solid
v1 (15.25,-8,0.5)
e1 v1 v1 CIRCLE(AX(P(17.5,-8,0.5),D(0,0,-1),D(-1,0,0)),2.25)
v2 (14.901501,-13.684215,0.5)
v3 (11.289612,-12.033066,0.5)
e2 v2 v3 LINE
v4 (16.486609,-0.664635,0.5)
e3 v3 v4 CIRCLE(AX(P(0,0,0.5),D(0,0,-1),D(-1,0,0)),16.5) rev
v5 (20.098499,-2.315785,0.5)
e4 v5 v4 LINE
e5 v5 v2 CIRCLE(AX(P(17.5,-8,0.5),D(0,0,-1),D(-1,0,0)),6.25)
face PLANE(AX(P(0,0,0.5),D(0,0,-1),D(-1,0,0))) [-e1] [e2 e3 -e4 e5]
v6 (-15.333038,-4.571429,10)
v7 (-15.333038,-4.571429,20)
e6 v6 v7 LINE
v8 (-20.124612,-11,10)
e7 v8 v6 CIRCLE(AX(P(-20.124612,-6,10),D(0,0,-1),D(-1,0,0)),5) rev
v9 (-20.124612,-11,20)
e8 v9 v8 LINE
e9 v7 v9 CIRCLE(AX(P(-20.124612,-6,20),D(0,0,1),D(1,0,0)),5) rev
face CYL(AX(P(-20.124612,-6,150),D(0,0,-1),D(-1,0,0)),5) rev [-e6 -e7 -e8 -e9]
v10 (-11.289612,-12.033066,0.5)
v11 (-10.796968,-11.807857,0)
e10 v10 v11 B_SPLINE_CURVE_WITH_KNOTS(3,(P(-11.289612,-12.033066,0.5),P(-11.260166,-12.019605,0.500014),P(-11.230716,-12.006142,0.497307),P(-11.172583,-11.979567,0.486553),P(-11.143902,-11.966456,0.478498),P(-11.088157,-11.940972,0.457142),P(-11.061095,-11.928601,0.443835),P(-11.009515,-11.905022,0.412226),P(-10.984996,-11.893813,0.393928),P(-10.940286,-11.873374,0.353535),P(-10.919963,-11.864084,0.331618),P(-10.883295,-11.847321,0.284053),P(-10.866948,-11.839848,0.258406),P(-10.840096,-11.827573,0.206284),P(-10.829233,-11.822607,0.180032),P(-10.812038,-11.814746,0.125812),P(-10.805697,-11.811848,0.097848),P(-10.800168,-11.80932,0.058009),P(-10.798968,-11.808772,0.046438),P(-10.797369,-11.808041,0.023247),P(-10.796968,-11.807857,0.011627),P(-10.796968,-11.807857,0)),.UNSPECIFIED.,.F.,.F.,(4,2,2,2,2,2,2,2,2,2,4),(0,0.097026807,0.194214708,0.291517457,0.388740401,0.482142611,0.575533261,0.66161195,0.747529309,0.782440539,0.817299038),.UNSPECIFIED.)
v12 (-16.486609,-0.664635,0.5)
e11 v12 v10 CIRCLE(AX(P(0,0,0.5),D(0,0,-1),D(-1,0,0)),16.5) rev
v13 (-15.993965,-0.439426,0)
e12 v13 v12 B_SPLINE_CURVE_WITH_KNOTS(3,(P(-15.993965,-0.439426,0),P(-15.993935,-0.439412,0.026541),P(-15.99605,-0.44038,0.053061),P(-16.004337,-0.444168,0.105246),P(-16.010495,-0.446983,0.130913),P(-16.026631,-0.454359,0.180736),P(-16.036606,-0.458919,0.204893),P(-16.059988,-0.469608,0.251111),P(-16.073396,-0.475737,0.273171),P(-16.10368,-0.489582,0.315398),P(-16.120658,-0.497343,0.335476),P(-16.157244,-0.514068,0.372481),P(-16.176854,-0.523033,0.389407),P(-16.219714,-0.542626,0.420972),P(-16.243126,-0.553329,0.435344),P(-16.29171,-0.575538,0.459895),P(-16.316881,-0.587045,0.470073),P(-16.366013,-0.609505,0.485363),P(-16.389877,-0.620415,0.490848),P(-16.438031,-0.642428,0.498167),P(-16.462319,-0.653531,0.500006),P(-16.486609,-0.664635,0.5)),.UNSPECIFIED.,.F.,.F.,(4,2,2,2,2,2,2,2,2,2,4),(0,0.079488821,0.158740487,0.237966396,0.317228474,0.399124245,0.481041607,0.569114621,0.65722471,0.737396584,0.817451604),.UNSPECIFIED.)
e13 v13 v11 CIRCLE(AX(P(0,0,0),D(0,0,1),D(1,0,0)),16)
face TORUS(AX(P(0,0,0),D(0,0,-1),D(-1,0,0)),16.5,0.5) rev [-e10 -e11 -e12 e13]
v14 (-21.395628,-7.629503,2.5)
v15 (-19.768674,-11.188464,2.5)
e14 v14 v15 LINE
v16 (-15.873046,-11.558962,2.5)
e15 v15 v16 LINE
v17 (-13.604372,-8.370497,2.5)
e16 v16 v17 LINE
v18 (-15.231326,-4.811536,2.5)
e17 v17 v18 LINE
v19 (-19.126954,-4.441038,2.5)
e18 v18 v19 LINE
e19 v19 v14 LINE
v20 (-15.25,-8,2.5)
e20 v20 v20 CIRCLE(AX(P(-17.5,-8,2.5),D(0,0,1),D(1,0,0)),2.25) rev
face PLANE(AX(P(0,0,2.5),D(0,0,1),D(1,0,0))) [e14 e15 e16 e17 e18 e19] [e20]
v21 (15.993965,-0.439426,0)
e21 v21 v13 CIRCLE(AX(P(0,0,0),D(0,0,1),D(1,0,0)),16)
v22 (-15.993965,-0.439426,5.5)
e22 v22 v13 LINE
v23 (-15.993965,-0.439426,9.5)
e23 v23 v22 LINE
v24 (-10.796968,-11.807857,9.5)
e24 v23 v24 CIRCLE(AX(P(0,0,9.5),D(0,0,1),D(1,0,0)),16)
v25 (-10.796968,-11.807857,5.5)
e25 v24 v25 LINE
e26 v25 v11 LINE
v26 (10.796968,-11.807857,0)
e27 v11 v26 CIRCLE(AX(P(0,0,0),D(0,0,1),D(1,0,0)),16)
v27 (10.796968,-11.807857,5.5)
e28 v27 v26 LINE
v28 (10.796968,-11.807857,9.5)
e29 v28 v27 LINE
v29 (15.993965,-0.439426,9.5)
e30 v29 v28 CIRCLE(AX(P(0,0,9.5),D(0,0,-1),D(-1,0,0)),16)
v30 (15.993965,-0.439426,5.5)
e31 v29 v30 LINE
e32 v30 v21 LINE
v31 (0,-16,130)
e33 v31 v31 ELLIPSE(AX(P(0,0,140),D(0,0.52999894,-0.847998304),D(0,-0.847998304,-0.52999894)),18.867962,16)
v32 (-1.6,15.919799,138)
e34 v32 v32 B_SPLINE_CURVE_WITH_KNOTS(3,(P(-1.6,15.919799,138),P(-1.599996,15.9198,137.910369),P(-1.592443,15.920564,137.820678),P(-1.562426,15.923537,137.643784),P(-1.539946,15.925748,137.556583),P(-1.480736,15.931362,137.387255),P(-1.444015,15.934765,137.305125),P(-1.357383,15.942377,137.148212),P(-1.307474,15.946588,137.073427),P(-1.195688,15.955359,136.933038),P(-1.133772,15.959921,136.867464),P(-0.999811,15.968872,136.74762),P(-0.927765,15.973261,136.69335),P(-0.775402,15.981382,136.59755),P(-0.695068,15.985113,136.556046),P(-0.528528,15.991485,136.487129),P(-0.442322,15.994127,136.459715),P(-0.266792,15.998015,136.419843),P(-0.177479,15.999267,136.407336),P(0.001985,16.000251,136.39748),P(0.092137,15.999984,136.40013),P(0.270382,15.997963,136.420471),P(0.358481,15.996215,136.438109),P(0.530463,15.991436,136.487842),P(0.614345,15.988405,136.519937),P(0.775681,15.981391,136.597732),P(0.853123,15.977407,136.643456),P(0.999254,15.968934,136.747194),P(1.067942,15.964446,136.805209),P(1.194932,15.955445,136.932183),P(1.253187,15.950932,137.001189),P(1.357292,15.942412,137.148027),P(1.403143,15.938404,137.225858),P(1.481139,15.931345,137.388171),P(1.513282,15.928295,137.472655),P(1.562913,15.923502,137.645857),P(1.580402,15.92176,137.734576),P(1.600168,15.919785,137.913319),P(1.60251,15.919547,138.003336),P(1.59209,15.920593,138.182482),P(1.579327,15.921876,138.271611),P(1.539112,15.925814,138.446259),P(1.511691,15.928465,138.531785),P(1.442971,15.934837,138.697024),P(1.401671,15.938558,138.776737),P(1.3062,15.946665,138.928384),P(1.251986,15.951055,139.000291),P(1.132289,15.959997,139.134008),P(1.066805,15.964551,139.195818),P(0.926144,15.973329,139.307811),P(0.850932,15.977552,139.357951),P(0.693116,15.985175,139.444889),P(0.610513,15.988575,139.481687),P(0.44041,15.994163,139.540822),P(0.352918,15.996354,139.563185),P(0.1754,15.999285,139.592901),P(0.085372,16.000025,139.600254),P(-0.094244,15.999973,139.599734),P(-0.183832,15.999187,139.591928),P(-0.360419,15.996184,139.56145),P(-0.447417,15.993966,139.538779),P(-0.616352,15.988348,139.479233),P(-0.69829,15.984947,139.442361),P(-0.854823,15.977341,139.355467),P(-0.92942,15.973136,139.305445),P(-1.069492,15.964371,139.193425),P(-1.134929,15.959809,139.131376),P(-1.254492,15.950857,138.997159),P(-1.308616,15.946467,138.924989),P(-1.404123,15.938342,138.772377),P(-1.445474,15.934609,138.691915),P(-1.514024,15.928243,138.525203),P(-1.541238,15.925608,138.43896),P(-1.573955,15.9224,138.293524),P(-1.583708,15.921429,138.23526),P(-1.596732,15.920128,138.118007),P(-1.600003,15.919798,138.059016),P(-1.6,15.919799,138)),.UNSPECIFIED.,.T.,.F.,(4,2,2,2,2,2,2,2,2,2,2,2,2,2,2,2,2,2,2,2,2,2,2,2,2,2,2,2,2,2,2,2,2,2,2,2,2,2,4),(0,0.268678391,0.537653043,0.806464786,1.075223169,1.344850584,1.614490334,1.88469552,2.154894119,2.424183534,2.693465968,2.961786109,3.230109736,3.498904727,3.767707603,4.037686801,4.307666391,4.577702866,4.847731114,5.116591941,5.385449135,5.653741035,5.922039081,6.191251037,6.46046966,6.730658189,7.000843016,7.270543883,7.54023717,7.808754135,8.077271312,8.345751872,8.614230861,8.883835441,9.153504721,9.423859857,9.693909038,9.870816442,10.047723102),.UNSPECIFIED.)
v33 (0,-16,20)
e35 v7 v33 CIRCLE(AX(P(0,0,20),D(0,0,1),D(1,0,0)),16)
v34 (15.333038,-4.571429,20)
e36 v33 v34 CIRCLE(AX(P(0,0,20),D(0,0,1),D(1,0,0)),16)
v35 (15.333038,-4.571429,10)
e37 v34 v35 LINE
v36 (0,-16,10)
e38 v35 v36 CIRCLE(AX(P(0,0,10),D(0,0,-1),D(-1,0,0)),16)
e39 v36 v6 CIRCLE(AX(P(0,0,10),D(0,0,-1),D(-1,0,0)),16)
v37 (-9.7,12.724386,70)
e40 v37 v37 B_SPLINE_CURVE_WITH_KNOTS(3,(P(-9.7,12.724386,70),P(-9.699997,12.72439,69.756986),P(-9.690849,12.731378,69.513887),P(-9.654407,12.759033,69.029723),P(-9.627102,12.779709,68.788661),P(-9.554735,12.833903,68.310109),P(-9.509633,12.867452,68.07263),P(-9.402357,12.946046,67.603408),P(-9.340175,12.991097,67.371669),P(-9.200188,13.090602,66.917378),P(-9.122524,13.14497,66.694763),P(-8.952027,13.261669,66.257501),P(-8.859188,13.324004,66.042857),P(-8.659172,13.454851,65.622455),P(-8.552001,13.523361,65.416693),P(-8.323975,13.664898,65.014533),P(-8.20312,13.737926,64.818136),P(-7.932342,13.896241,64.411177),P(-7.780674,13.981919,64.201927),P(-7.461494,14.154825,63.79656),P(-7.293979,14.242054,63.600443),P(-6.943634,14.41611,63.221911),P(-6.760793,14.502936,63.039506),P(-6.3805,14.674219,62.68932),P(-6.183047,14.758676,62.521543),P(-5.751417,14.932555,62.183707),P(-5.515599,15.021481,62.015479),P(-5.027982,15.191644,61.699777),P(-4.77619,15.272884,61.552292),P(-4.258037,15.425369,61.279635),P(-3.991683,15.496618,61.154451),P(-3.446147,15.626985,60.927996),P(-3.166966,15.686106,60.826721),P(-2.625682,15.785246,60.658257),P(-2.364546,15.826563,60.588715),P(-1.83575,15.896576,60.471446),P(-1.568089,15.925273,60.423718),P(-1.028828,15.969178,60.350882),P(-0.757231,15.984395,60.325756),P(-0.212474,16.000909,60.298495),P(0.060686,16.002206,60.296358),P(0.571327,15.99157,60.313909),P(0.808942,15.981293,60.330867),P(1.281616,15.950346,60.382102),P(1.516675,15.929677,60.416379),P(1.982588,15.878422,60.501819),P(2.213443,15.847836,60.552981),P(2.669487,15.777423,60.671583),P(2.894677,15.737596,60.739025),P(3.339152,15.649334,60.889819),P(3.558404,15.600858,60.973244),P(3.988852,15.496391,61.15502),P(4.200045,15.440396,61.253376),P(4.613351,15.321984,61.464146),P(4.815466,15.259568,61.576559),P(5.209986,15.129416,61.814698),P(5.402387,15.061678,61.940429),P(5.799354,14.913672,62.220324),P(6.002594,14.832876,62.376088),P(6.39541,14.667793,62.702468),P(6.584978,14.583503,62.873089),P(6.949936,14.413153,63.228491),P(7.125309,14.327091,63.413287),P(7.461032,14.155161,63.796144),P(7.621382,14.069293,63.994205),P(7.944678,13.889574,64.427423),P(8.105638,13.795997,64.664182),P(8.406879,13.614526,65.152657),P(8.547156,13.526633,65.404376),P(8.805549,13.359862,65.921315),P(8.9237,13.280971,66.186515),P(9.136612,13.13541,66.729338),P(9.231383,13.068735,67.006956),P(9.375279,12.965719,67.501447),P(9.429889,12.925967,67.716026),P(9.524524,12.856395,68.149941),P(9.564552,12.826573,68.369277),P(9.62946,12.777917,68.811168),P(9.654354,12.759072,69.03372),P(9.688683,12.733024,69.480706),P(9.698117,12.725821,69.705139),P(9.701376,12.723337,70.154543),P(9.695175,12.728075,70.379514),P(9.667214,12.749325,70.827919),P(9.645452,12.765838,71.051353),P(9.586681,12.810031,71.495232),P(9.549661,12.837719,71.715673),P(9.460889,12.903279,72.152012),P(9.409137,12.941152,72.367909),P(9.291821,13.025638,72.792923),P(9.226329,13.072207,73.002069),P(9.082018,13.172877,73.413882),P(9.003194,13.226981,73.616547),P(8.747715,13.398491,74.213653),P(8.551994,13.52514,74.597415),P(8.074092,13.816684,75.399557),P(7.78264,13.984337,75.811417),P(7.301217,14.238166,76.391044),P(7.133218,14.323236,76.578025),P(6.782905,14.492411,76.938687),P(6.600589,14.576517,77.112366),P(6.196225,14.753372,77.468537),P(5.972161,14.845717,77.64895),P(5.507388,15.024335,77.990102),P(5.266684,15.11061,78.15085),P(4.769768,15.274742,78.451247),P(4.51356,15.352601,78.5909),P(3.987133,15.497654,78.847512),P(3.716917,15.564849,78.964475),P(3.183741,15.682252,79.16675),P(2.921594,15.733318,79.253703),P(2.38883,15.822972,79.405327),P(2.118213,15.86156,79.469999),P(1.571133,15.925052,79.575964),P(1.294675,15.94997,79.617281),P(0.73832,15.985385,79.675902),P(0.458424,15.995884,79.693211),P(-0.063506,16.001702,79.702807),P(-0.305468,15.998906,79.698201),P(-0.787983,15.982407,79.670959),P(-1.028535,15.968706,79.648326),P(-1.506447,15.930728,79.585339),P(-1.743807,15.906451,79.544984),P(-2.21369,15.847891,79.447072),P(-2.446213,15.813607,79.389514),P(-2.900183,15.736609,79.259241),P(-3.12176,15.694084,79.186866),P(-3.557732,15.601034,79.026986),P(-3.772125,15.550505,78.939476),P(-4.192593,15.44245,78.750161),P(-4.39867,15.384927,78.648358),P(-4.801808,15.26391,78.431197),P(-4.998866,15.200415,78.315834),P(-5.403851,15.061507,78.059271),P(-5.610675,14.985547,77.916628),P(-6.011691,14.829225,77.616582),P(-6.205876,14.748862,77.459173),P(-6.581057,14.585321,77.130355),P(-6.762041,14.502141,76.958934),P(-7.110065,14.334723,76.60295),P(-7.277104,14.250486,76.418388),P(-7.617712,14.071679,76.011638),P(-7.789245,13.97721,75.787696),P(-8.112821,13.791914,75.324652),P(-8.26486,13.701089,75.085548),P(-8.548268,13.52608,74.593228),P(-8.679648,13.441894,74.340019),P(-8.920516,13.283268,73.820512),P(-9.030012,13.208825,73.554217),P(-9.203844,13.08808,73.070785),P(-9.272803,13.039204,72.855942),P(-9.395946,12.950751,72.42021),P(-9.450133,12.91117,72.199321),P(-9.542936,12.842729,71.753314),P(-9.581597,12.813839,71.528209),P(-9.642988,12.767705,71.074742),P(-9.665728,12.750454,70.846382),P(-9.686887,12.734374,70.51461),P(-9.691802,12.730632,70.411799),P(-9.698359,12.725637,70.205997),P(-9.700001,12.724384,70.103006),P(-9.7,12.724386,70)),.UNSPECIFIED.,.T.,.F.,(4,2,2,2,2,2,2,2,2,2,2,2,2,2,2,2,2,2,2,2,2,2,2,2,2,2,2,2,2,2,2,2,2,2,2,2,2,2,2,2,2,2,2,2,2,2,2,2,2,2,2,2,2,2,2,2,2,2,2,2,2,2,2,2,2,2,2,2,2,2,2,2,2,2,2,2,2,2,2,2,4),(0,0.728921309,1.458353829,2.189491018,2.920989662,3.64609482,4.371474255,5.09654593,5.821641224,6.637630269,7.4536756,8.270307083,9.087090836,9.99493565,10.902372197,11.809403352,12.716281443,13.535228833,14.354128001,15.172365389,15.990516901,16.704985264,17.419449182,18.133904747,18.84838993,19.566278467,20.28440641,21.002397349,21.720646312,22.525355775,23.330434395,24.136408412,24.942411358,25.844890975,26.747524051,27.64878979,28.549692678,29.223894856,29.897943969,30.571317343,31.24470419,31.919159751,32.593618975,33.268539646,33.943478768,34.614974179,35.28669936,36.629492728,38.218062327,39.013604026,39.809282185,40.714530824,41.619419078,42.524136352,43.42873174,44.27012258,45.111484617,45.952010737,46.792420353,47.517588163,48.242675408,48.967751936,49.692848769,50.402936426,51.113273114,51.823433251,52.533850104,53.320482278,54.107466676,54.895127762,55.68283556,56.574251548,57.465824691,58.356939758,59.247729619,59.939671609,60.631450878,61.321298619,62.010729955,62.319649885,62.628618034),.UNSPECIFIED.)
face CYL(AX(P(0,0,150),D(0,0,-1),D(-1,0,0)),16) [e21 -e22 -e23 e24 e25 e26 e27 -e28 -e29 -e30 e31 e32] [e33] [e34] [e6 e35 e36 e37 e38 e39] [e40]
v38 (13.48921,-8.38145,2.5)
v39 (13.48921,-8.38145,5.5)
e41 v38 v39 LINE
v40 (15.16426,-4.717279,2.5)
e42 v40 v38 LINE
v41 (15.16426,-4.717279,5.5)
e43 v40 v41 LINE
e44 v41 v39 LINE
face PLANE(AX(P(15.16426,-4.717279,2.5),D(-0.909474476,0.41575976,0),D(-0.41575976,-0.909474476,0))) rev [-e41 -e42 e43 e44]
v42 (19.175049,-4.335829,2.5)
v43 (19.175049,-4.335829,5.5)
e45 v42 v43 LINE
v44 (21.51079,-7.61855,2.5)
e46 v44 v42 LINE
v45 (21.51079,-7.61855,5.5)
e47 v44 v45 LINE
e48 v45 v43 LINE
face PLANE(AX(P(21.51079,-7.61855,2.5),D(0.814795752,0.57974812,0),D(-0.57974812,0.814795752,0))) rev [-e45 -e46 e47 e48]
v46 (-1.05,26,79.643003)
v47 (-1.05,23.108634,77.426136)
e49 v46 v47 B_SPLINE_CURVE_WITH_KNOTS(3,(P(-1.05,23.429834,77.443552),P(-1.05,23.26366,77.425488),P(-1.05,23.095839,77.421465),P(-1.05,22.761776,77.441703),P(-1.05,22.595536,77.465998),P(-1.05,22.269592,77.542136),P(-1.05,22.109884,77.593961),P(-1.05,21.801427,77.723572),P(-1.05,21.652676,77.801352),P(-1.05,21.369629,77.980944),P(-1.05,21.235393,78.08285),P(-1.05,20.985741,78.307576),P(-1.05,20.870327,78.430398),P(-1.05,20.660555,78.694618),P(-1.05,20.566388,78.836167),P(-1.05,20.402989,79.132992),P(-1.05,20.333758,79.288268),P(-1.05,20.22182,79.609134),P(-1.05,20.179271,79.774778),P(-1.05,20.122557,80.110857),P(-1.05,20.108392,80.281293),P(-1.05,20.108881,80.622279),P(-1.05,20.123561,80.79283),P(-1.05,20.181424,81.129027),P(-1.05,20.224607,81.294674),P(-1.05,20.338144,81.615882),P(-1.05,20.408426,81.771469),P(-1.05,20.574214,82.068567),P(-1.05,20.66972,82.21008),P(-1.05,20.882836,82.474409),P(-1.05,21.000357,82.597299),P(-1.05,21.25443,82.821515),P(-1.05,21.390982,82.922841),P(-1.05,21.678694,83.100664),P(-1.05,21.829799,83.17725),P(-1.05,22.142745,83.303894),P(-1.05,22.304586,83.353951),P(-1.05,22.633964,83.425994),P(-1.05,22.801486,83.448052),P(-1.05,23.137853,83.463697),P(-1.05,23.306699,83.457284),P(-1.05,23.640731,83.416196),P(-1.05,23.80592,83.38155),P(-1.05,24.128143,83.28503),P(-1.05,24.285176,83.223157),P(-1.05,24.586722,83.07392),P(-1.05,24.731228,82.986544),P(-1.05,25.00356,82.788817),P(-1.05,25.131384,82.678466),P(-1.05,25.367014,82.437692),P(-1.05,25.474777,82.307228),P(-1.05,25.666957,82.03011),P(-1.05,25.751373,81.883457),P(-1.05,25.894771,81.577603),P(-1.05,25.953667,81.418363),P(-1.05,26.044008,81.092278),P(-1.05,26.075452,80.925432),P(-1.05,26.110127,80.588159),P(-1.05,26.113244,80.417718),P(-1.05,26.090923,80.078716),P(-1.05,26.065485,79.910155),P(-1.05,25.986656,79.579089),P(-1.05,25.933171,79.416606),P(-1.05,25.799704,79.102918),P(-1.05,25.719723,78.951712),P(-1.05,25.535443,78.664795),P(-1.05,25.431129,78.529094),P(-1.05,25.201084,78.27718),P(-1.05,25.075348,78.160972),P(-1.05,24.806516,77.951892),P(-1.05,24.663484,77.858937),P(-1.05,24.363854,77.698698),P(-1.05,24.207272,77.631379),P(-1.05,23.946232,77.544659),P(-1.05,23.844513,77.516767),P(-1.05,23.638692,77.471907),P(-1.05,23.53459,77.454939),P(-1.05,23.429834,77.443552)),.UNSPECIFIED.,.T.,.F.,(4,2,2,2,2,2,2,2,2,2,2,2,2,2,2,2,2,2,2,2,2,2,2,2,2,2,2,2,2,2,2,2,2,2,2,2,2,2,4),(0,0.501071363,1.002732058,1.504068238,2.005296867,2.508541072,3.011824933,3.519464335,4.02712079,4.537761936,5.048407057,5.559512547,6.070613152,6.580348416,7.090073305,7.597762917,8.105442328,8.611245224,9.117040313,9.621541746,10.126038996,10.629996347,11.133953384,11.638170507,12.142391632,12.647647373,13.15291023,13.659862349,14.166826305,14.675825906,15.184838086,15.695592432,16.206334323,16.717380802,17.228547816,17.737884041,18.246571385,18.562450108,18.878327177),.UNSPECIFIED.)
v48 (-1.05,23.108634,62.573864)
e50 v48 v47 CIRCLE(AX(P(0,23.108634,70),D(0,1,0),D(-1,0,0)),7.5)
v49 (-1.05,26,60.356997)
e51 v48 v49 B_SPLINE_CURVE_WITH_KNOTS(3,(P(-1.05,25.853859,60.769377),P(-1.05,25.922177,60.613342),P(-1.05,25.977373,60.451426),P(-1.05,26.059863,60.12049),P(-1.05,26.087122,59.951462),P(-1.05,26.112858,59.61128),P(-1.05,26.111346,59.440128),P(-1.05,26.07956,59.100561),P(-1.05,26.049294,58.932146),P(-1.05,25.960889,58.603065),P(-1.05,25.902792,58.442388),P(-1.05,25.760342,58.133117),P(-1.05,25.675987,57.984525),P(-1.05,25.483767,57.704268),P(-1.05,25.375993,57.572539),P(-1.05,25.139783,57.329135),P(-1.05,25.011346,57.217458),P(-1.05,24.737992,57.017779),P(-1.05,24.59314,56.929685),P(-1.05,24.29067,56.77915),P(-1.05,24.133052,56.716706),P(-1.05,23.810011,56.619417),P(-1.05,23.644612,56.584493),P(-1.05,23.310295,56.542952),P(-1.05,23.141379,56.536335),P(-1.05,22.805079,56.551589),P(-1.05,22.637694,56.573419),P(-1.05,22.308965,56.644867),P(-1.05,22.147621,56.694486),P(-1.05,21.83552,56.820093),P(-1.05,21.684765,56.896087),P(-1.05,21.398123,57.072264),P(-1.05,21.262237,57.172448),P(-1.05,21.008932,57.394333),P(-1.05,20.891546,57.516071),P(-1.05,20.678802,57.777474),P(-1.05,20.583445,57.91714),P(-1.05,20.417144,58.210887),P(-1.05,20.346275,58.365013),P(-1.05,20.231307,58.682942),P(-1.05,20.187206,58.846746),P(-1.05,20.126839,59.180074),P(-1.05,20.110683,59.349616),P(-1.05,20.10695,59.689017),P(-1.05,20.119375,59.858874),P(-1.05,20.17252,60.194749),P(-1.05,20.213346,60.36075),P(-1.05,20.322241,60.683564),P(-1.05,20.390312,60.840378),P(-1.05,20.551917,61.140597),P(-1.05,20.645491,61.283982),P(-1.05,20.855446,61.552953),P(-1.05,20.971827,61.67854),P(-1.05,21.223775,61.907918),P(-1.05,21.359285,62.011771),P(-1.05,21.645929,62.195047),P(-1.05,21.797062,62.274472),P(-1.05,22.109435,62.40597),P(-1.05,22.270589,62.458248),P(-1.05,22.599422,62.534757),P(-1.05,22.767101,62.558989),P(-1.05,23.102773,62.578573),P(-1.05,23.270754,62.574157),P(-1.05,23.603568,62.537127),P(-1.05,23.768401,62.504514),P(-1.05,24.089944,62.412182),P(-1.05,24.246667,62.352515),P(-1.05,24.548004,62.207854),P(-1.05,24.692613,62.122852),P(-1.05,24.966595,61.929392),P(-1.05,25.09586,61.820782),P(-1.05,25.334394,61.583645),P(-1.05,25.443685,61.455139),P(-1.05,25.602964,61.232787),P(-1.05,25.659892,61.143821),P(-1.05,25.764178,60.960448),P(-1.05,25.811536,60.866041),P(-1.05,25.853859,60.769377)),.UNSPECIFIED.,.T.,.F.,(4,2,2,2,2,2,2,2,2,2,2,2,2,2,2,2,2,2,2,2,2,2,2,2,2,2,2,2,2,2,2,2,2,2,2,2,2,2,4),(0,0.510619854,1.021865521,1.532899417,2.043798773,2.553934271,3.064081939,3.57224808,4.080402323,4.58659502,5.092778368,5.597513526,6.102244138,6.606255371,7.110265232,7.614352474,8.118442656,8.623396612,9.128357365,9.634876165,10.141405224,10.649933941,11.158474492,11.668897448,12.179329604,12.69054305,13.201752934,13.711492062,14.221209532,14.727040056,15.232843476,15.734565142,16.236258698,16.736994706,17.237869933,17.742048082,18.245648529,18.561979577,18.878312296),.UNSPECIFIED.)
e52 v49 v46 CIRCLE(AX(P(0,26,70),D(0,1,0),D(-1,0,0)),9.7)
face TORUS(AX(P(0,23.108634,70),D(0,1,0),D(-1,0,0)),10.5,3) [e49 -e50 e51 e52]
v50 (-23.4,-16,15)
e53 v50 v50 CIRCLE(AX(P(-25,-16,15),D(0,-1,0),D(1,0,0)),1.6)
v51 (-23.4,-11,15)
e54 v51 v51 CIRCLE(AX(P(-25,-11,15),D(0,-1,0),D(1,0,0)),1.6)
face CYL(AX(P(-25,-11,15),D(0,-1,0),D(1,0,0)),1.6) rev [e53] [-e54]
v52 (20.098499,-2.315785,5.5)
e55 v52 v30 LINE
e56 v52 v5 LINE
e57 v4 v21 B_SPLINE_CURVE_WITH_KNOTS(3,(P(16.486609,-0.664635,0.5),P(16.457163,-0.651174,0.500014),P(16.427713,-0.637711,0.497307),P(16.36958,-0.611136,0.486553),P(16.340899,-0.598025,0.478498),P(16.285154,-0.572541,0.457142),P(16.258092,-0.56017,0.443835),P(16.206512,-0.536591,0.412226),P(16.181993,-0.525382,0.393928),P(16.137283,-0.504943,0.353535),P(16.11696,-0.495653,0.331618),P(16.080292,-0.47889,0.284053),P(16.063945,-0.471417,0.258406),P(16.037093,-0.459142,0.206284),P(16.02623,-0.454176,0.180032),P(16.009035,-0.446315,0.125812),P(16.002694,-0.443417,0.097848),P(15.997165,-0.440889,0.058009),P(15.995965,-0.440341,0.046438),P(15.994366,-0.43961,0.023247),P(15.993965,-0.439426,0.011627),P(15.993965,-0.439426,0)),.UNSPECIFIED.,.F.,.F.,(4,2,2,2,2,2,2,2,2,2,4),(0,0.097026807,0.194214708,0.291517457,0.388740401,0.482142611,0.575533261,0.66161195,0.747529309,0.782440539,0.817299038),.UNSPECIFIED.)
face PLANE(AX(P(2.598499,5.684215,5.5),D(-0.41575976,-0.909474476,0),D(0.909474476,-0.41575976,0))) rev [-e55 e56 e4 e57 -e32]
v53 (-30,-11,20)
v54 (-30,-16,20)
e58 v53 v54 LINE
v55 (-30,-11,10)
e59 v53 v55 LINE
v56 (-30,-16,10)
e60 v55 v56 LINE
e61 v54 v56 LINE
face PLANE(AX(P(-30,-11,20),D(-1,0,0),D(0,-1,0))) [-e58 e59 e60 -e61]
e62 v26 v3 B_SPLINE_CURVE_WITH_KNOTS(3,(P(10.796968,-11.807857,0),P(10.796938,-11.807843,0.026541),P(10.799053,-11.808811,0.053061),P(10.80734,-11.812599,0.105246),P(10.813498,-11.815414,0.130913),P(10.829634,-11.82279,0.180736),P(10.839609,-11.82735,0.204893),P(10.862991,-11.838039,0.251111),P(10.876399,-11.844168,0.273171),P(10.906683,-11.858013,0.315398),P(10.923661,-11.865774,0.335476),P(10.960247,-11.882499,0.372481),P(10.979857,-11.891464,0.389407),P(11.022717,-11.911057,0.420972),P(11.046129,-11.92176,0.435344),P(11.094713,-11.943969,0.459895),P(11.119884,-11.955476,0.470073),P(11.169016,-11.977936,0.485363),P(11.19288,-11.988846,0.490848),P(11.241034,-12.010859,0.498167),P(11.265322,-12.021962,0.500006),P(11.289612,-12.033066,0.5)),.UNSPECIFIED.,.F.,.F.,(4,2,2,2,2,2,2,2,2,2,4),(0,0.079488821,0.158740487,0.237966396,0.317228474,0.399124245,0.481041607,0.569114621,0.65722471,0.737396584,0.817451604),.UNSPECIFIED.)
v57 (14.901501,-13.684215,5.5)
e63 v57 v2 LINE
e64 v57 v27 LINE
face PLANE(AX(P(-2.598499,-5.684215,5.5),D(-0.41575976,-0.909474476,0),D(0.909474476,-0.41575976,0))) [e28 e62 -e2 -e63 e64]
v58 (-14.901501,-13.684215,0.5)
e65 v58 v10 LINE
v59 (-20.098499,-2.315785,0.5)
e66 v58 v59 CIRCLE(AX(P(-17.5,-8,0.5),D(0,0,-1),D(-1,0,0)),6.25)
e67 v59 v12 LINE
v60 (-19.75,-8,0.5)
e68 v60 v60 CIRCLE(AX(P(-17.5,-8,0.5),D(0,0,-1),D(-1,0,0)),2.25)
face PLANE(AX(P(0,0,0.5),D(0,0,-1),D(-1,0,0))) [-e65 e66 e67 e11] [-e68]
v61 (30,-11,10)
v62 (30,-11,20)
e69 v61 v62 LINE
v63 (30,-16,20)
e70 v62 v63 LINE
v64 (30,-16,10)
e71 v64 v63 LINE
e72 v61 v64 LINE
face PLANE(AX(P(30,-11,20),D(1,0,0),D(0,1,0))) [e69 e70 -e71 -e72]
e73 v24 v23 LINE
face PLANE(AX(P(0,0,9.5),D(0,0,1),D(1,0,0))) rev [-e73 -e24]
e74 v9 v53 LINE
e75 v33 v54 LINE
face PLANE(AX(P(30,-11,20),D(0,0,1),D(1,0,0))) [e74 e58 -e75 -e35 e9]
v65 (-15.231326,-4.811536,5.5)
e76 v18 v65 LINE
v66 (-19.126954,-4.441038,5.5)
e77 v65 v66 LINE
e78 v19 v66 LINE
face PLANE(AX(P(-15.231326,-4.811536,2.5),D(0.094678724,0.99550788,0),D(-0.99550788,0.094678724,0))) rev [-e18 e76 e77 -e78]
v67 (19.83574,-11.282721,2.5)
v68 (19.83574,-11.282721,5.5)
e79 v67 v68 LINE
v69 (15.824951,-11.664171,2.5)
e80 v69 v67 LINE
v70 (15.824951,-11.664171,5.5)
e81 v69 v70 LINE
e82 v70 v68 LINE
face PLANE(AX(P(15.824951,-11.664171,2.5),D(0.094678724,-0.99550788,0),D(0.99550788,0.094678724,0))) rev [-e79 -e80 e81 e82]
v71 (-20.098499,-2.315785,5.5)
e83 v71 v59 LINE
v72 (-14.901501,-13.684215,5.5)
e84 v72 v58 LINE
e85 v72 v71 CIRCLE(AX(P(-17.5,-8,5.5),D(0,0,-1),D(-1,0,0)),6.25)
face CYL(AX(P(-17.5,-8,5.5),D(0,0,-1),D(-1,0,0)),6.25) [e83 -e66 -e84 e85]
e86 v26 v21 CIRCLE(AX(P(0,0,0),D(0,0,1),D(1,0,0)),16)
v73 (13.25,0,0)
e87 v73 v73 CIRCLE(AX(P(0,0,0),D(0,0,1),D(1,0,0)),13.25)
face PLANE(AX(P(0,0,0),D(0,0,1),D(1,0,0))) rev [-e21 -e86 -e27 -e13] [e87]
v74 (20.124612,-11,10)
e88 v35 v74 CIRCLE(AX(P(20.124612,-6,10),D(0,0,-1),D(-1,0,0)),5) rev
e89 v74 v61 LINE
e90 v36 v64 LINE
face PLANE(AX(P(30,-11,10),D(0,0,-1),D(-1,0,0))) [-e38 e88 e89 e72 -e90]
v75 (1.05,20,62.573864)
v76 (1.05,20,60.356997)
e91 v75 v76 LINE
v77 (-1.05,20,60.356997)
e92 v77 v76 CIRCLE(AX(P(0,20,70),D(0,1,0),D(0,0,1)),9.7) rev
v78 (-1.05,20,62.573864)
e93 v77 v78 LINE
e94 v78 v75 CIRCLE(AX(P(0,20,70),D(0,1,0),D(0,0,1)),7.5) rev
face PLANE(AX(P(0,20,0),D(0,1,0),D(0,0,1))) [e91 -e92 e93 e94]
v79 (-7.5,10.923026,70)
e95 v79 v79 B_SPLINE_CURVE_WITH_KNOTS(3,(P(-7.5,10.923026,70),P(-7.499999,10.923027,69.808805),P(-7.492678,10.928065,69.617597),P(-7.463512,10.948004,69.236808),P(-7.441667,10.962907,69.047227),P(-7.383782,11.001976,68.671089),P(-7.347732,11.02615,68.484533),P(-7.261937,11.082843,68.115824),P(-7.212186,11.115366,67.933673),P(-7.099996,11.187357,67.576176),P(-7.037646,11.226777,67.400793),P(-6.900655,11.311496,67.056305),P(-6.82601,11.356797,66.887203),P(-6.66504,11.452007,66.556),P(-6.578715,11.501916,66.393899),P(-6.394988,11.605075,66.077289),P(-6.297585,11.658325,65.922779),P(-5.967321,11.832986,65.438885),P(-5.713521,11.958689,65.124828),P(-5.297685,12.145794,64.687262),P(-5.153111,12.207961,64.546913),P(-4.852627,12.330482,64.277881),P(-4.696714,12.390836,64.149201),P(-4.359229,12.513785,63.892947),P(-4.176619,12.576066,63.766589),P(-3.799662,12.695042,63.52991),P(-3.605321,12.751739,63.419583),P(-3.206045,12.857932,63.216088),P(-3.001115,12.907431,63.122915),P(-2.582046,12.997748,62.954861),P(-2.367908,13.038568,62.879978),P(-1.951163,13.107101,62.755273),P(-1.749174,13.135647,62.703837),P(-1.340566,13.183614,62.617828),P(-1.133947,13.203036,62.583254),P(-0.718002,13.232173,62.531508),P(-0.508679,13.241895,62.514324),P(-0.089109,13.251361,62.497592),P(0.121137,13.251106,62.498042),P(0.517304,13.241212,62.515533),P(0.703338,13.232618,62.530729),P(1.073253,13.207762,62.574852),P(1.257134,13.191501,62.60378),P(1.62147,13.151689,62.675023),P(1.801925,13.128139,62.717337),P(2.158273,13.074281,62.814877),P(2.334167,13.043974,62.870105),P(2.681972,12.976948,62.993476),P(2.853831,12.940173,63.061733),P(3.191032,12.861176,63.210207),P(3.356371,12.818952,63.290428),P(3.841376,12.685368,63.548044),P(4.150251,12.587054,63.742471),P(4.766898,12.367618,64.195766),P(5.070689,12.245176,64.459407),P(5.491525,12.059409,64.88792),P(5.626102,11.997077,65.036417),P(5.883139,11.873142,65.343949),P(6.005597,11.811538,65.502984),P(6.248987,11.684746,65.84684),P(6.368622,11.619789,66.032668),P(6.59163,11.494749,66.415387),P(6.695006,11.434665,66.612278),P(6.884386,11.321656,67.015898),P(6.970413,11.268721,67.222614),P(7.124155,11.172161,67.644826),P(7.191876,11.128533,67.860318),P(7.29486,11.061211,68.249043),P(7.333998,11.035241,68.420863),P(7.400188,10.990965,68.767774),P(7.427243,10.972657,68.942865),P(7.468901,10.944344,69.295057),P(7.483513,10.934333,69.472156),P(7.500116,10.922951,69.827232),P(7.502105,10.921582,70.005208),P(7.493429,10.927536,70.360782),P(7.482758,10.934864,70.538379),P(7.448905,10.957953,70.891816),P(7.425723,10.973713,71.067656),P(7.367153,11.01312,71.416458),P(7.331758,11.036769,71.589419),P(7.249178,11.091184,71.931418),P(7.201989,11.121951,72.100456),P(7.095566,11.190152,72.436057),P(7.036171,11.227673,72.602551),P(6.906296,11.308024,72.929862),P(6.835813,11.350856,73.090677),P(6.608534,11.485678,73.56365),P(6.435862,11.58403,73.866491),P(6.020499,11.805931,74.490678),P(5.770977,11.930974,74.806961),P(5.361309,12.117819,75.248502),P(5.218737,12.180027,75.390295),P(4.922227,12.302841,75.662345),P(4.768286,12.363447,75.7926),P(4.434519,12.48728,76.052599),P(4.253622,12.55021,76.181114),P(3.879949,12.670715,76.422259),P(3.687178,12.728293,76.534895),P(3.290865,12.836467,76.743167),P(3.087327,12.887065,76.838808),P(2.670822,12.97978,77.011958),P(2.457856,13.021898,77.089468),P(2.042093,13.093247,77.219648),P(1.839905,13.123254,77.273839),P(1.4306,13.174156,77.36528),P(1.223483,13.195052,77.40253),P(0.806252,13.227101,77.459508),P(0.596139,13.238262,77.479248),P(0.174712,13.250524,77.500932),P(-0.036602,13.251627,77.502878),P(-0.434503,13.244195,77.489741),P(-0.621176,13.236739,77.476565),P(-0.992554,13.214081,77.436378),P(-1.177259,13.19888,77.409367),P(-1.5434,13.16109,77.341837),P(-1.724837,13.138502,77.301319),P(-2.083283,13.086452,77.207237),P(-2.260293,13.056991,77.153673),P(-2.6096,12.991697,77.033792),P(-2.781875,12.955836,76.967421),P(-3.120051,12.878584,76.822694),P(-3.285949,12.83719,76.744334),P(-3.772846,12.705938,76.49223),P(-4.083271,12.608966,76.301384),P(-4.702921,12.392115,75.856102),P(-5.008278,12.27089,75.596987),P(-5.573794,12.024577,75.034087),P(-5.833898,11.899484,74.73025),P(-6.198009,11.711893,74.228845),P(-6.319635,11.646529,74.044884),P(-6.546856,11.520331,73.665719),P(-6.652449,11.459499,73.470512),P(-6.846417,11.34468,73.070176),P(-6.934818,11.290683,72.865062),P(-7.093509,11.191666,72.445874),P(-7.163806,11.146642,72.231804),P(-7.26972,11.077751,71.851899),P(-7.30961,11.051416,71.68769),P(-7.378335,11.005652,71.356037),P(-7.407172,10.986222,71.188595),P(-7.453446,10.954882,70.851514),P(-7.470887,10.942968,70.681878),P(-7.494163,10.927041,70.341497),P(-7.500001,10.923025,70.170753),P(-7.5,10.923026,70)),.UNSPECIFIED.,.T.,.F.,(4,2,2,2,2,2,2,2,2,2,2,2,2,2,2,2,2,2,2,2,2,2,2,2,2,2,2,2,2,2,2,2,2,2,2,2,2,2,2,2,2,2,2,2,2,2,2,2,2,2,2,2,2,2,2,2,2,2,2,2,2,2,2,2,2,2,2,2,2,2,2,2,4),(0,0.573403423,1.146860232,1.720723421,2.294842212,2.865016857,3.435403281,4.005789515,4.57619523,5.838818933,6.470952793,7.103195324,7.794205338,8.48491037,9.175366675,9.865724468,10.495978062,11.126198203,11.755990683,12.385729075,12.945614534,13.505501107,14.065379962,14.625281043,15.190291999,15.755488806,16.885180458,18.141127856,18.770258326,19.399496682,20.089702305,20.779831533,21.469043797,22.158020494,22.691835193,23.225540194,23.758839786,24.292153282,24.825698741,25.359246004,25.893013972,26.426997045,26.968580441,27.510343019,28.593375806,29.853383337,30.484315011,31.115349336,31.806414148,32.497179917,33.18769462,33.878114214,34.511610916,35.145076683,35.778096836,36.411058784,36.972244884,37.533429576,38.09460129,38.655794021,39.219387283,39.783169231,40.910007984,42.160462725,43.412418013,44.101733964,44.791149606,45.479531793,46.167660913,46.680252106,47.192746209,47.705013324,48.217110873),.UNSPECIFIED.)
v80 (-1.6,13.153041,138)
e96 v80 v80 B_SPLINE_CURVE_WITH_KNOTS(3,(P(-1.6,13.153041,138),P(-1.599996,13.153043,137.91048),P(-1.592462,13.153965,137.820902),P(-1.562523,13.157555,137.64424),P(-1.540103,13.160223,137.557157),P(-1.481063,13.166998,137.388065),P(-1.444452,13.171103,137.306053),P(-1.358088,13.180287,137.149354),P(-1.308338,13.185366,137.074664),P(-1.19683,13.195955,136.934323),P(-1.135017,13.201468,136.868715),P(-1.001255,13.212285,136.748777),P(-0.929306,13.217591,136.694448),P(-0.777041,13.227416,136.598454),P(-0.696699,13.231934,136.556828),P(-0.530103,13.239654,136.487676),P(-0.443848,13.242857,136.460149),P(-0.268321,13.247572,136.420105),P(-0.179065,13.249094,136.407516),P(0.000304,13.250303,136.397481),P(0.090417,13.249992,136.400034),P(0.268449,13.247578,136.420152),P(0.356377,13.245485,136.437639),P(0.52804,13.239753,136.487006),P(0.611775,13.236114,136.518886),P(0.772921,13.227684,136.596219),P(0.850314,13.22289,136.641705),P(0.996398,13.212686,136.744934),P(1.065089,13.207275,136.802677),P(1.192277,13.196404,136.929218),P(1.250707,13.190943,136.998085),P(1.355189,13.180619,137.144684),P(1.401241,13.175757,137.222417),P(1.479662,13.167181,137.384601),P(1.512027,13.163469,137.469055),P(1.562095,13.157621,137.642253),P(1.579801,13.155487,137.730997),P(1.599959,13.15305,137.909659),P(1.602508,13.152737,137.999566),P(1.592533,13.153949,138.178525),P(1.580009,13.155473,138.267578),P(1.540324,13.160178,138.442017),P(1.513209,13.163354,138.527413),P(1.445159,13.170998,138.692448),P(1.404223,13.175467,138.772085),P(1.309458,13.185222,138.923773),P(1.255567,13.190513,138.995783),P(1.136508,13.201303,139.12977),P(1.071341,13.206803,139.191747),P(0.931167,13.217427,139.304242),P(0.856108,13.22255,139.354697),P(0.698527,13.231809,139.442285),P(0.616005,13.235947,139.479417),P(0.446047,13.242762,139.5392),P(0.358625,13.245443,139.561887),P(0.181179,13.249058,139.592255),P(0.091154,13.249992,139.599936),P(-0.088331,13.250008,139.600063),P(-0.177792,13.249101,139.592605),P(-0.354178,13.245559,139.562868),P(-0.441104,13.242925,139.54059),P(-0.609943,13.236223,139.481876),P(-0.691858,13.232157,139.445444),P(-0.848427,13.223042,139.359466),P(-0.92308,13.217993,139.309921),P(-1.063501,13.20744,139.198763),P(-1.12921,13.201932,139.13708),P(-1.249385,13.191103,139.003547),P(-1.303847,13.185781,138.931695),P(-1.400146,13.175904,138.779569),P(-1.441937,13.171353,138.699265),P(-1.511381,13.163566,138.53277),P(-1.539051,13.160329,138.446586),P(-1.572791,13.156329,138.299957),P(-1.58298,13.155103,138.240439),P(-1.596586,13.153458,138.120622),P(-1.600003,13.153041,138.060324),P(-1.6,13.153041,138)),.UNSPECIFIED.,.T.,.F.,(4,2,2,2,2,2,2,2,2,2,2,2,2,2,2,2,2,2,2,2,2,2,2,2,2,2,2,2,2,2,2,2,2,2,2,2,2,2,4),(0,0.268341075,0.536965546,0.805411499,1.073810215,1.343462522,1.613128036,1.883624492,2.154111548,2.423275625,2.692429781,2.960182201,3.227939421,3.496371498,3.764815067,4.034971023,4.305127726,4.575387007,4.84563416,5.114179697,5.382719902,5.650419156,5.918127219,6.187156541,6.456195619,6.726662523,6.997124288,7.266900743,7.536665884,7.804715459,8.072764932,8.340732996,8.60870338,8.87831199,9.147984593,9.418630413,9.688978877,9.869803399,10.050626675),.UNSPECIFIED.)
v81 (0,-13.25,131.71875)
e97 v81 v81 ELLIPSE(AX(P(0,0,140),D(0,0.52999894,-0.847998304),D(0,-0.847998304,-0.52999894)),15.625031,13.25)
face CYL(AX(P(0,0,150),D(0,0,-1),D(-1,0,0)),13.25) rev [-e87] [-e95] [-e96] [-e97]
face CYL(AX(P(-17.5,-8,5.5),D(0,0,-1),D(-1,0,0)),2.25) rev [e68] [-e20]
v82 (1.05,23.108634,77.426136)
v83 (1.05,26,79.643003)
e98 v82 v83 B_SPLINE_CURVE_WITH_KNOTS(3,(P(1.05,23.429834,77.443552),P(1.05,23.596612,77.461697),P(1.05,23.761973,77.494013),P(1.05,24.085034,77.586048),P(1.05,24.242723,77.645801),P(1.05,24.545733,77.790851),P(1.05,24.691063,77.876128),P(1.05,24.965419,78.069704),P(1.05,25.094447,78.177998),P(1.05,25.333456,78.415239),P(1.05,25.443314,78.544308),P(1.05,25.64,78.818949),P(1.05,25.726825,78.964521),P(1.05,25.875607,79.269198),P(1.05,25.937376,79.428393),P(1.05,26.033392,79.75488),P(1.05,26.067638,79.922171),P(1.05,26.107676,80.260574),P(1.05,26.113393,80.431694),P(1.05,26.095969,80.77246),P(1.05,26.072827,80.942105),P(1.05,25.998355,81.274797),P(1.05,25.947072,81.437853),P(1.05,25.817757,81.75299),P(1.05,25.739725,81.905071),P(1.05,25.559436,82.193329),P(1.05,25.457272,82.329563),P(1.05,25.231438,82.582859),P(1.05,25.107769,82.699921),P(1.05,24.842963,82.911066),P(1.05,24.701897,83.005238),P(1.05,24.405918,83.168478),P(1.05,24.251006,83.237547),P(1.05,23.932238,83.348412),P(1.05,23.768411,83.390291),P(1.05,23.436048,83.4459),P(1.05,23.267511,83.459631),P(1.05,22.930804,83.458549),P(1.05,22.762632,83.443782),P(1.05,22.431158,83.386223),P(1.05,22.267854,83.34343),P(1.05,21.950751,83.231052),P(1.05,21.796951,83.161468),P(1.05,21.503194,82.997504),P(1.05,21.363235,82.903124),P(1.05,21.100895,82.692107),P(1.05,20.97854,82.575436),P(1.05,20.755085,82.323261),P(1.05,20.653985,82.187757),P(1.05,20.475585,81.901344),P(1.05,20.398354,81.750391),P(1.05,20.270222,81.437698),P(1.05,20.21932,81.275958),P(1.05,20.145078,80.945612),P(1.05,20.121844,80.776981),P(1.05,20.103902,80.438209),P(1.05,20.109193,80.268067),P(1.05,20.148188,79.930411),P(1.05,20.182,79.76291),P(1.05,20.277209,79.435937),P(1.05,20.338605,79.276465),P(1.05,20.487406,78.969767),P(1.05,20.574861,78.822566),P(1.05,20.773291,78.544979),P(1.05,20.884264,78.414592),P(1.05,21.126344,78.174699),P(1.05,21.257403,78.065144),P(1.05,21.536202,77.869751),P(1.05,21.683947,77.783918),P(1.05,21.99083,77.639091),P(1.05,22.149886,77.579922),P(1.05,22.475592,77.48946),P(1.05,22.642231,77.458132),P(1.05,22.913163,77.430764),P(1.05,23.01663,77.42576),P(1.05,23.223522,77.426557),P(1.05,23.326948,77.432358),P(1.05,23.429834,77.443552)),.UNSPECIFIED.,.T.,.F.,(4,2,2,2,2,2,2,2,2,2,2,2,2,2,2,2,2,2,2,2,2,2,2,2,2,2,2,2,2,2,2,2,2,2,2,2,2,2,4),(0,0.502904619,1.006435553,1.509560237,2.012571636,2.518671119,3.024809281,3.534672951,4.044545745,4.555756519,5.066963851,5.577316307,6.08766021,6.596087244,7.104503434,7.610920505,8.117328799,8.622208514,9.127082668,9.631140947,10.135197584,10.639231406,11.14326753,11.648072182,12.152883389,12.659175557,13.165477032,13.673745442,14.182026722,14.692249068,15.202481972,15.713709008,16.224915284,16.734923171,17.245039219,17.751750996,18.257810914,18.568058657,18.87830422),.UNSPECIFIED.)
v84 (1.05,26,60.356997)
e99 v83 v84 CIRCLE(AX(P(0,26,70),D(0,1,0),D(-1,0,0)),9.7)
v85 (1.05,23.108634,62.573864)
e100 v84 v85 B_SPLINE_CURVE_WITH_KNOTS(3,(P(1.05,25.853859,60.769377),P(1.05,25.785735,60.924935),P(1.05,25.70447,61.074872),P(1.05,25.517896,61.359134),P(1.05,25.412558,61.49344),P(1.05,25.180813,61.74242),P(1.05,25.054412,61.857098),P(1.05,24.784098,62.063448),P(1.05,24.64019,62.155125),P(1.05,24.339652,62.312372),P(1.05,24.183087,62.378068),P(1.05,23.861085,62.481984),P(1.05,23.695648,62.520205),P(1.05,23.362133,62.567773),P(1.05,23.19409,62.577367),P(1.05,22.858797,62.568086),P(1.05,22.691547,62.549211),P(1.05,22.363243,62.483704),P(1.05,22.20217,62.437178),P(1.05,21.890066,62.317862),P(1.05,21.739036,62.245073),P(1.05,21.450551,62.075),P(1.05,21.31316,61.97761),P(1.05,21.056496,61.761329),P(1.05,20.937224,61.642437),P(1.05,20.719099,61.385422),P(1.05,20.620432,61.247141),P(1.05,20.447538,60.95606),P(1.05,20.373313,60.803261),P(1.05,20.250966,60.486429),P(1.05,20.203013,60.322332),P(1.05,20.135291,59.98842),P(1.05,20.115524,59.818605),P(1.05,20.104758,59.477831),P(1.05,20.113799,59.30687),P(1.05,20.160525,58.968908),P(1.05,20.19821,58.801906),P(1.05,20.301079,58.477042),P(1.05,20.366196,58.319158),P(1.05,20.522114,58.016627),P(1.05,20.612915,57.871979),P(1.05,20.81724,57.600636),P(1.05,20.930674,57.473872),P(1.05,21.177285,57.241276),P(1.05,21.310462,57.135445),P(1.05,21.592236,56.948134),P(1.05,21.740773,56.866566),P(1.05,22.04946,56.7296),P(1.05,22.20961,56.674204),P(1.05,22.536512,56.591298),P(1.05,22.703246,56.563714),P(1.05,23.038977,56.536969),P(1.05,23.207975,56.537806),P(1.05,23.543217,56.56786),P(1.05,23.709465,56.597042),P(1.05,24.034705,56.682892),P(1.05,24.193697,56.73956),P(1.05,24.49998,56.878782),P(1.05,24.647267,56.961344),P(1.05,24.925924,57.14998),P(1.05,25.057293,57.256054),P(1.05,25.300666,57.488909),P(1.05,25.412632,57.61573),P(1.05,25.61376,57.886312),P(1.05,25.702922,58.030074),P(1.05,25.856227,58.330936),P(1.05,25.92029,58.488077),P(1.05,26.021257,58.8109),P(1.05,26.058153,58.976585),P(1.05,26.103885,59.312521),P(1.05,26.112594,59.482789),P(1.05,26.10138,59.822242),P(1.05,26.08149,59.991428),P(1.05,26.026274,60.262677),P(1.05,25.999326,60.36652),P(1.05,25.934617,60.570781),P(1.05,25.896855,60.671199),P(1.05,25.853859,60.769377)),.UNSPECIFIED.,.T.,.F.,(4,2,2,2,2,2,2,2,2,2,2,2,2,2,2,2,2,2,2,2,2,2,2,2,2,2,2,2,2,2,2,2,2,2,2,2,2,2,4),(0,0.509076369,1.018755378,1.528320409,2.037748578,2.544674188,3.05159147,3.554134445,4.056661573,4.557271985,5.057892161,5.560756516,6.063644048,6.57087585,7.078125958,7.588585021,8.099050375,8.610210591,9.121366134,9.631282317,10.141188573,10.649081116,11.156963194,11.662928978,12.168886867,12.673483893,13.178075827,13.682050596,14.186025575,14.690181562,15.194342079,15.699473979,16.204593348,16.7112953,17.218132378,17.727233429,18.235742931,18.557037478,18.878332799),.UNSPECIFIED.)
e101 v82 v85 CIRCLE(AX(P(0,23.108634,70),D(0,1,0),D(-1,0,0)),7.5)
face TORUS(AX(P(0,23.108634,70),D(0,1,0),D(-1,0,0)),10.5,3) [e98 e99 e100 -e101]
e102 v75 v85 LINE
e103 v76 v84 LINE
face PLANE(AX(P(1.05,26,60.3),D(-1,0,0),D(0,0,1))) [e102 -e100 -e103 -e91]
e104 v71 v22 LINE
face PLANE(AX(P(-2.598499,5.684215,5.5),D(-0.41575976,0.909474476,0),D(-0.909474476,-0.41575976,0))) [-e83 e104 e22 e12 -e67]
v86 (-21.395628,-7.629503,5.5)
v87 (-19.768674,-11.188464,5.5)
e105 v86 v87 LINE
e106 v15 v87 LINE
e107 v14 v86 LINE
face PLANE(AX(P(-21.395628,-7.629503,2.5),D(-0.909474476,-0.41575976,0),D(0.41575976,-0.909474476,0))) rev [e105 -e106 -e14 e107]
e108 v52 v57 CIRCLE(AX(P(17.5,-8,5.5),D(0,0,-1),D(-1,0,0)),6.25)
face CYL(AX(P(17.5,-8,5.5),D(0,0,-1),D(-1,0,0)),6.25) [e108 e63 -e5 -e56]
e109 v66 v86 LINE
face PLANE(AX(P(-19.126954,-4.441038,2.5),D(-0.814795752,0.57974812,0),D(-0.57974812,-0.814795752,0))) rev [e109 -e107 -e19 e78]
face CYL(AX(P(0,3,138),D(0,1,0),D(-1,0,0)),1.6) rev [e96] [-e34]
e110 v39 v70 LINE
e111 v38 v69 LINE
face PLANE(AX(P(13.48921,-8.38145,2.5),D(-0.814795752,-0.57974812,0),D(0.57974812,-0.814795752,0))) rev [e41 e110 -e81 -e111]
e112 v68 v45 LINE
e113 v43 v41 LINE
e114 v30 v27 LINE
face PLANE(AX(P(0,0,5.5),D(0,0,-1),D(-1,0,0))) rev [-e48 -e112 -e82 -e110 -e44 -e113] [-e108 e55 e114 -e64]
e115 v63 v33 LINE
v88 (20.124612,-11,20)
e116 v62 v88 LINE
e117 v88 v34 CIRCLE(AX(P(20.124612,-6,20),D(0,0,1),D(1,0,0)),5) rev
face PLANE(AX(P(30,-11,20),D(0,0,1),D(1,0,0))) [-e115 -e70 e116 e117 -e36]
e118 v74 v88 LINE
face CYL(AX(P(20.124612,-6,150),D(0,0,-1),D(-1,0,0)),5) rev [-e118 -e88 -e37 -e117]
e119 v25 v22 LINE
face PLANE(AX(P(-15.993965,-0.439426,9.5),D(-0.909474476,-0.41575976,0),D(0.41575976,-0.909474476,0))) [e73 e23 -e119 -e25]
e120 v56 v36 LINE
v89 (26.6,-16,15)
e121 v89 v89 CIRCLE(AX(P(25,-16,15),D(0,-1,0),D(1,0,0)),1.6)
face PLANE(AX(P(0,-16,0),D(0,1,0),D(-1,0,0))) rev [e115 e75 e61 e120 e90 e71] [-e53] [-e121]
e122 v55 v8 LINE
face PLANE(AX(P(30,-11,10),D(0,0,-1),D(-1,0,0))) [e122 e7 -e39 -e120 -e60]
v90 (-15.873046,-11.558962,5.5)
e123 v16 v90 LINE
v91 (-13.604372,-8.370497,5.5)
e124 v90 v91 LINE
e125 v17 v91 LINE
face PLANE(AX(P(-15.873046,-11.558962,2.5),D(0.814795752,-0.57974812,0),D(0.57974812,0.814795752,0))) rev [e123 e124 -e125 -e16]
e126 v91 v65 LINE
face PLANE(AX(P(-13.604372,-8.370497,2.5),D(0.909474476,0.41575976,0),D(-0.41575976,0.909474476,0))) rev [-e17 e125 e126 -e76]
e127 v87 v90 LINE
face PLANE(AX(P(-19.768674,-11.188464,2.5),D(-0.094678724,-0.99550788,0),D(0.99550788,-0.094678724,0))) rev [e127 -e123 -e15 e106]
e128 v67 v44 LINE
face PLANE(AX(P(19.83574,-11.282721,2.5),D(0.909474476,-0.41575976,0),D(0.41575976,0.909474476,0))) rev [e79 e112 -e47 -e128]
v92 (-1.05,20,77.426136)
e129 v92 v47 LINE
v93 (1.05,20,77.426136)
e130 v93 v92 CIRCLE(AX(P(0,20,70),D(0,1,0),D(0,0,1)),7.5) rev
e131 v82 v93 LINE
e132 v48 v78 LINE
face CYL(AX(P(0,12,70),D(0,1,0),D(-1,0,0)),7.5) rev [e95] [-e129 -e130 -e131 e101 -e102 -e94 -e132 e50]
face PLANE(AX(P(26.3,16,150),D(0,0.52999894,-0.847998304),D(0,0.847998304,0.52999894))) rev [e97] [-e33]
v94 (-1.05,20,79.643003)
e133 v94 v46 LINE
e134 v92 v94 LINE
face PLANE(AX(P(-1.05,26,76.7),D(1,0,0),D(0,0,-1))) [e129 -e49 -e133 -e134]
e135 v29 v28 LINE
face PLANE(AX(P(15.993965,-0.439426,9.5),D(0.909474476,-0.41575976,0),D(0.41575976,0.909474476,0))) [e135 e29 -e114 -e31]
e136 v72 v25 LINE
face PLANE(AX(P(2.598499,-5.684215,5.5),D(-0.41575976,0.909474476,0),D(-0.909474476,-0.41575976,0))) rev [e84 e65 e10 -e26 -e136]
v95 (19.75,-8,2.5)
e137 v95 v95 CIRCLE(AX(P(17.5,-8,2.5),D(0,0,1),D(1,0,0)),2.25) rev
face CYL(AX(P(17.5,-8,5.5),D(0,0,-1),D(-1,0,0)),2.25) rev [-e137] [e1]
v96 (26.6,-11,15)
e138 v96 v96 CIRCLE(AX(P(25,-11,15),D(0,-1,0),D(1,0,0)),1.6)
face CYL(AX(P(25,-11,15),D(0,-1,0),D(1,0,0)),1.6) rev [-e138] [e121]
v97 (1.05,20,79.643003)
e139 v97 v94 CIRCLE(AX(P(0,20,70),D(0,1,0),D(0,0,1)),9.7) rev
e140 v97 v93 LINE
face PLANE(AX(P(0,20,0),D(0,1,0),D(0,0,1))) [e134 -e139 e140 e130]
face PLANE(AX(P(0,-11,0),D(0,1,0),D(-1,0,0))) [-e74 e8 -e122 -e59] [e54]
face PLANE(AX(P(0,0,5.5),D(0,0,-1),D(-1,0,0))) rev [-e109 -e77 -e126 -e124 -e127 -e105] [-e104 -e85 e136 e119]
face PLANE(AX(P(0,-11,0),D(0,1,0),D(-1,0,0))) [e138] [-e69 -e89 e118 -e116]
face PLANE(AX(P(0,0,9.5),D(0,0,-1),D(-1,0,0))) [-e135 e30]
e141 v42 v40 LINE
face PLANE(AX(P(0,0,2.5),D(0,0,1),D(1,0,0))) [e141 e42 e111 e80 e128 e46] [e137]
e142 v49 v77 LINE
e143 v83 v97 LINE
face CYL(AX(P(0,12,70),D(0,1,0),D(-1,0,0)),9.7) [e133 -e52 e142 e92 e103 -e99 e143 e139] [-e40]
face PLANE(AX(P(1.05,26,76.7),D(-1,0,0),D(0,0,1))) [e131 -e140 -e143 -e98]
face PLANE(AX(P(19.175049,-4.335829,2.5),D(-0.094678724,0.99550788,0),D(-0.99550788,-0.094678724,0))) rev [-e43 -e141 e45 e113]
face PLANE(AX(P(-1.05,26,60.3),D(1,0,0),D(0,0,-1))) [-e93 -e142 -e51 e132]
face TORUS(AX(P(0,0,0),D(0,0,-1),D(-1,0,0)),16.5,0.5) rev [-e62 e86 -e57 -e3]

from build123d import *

# Parameters (mm, degrees)
SKETCH4_R                = 16
SKETCH4_R_2              = 13.25
BOSS_EXTRUDE3_DEPTH      = 150
BOSS_EXTRUDE4_DEPTH      = 10
BOSS_EXTRUDE4_DEPTH_BACK = 4
SKETCH6_R                = 9.7
SKETCH6_R_2              = 7.5
SKETCH7_R                = 7.5
CUT_EXTRUDE1_DEPTH       = 20
CUT_EXTRUDE2_START       = -150
SKETCH8_R                = 13.25
CUT_EXTRUDE2_DEPTH       = 150
SKETCH11_R               = 1.6
CUT_EXTRUDE5_DEPTH       = 13
CUT_EXTRUDE7_DEPTH       = 42.3
SKETCH15_W               = 60
SKETCH15_H               = 10
SKETCH15_R               = 1.6
BOSS_EXTRUDE5_DEPTH      = 5
SKETCH16_R               = 13.25
CUT_EXTRUDE8_DEPTH       = 150
FILLET2_R                = 3
FILLET3_R                = 5
CUT_EXTRUDE10_START      = 4
SKETCH20_R               = 4.747407389
SKETCH20_W               = 2.1
SKETCH20_H               = 3
CUT_EXTRUDE10_DEPTH      = 6
BOSS_EXTRUDE6_START      = -0.5
BOSS_EXTRUDE6_DEPTH      = 5
FILLET4_R                = 0.5
CUT_EXTRUDE11_DEPTH      = 4
CUT_EXTRUDE12_DEPTH      = 3


# Some blends are built 0.0001 mm under size
with BuildPart() as part:
    # Sketch4 → Boss-Extrude3 (new body)
    with BuildSketch(Plane.XY):
        Circle(SKETCH4_R)
        Circle(SKETCH4_R_2, mode=Mode.SUBTRACT)
    extrude(amount=BOSS_EXTRUDE3_DEPTH)

    # Sketch6 → Boss-Extrude4 (add, two sides: drawn at the far end of the back side and taken through both)
    with BuildSketch(Plane(origin=(0, 16, 150), x_dir=(1, 0, 0), z_dir=(0, 1, 0)).offset(-BOSS_EXTRUDE4_DEPTH_BACK)):
        with Locations(Location((0, 80, 0), (0, 0, 180))):
            Circle(SKETCH6_R)
        with Locations(Location((0, 80, 0), (0, 0, 180))):
            Circle(SKETCH6_R_2, mode=Mode.SUBTRACT)
    extrude(amount=BOSS_EXTRUDE4_DEPTH + BOSS_EXTRUDE4_DEPTH_BACK)

    # Sketch7 → Cut-Extrude1 (cut)
    with BuildSketch(Plane(origin=(0, 26, 0), x_dir=(1, 0, 0), z_dir=(0, 1, 0))):
        with Locations(Location((0, -70, 0), (0, 0, 180))):
            Circle(SKETCH7_R)
    extrude(amount=-CUT_EXTRUDE1_DEPTH, mode=Mode.SUBTRACT)

    # Sketch8 → Cut-Extrude2 (cut)
    with BuildSketch(Plane.XY.offset(150).offset(CUT_EXTRUDE2_START)):
        Circle(SKETCH8_R)
    extrude(amount=CUT_EXTRUDE2_DEPTH, mode=Mode.SUBTRACT)

    # Sketch11 → Cut-Extrude5 (cut)
    with BuildSketch(Plane(origin=(0, 16, 150), x_dir=(1, 0, 0), z_dir=(0, 1, 0))):
        with Locations(Location((0, 12, 0), (0, 0, 180))):
            Circle(SKETCH11_R)
    extrude(amount=-CUT_EXTRUDE5_DEPTH, mode=Mode.SUBTRACT)

    # Sketch14 → Cut-Extrude7 (cut)
    with BuildSketch(Plane.ZY.offset(16)):
        Polygon((150, 16), (130, -16), (150, -16), align=None)
    extrude(amount=-CUT_EXTRUDE7_DEPTH, mode=Mode.SUBTRACT)

    # Sketch15 → Boss-Extrude5 (add)
    with BuildSketch(Plane(origin=(0, -16, 150), x_dir=(-1, 0, 0), z_dir=(0, -1, 0))):
        with Locations((0, 135)):
            Rectangle(SKETCH15_W, SKETCH15_H)
        with Locations(Location((-25, 135, 0), (0, 0, 180))):
            Circle(SKETCH15_R, mode=Mode.SUBTRACT)
        with Locations(Location((25, 135, 0), (0, 0, 180))):
            Circle(SKETCH15_R, mode=Mode.SUBTRACT)
    extrude(amount=-BOSS_EXTRUDE5_DEPTH)

    # Sketch16 → Cut-Extrude8 (cut)
    with BuildSketch(Plane(origin=(0, 0, 0), x_dir=(-1, 0, 0), z_dir=(0, 0, -1))):
        with Locations(Location((0, 0, 0), (0, 0, 270))):
            Circle(SKETCH16_R)
    extrude(amount=-CUT_EXTRUDE8_DEPTH, mode=Mode.SUBTRACT)

    # Fillet2
    # the kernel refuses this fillet: 3 mm, written as the material it takes off along each edge
    with BuildSketch(Plane(origin=(0, 26, 70), x_dir=(-1, 0, 0), z_dir=(0, 0, -1))) as fillet2_piece_1:
        with BuildLine():
            CenterArc((10.5, -2.891366459), FILLET2_R, 105.466009953, 74.533990047)
            Line((7.5, -2.891366459), (7.44, -2.891366459))
            Line((7.44, -2.891366459), (7.44, 0))
            Line((7.44, 0), (7.5, 0.06))
            ThreePointArc((7.5, 0.06), (8.6, 0.06), (9.684, 0.057827329))
            Line((9.684, 0.057827329), (9.7, 0))
        make_face()
    revolve(axis=Axis((0, 26, 70), (0, 1, 0)), mode=Mode.SUBTRACT)

    # Fillet3
    fillet3_edges = [part.edges().sort_by_distance(p)[0] for p in [
        (11.618950039, -11, 15),
        (-11.618950039, -11, 15),
    ]]
    fillet(fillet3_edges, radius=FILLET3_R)

    # Sketch20 → Cut-Extrude10 (cut)
    with BuildSketch(Plane(origin=(0, 16, 150), x_dir=(1, 0, 0), z_dir=(0, 1, 0)).offset(CUT_EXTRUDE10_START)):
        with Locations((0, 80)):
            Circle(SKETCH20_R)
        with Locations((0, 88.2)):
            Rectangle(SKETCH20_W, SKETCH20_H)
        with Locations((0, 71.8)):
            Rectangle(SKETCH20_W, SKETCH20_H)
    extrude(amount=CUT_EXTRUDE10_DEPTH, mode=Mode.SUBTRACT)

    # Sketch21 → Boss-Extrude6 (add)
    with BuildSketch(Plane(origin=(0, 0, 0), x_dir=(-1, 0, 0), z_dir=(0, 0, -1)).offset(BOSS_EXTRUDE6_START)):
        with BuildLine():
            Line((-17.5, -5.75), (-17.5, -1.127899498))
            Line((-17.5, -1.127899498), (-20.098498502, -2.315784528))
            ThreePointArc((-20.098498502, -2.315784528), (-23.184215472, -10.598498502), (-14.901501498, -13.684215472))
            Line((-14.901501498, -13.684215472), (-10.796967628, -11.807857132))
            ThreePointArc((-10.796967628, -11.807857132), (-12.472856829, -10.021369294), (-13.856406461, -8))
            Line((-13.856406461, -8), (-15.25, -8))
            ThreePointArc((-15.25, -8), (-19.090990258, -9.590990258), (-17.5, -5.75))
        make_face()
        with BuildLine():
            ThreePointArc((-13.856406461, -8), (-15.396484426, -4.352960754), (-15.993964631, -0.439426187))
            Line((-15.993964631, -0.439426187), (-17.5, -1.127899498))
            Line((-17.5, -1.127899498), (-17.5, -5.75))
            ThreePointArc((-17.5, -5.75), (-15.909009742, -6.409009742), (-15.25, -8))
            Line((-15.25, -8), (-13.856406461, -8))
        make_face()
        with BuildLine():
            Line((20.098498502, -2.315784528), (17.5, -1.127899498))
            Line((17.5, -1.127899498), (17.5, -5.75))
            ThreePointArc((17.5, -5.75), (19.090990258, -6.409009742), (19.75, -8))
            ThreePointArc((19.75, -8), (17.5, -10.25), (15.25, -8))
            Line((15.25, -8), (13.856406461, -8))
            ThreePointArc((13.856406461, -8), (12.472856829, -10.021369294), (10.796967628, -11.807857132))
            Line((10.796967628, -11.807857132), (14.901501498, -13.684215472))
            ThreePointArc((14.901501498, -13.684215472), (23.184215472, -10.598498502), (20.098498502, -2.315784528))
        make_face()
        with BuildLine():
            Line((17.5, -5.75), (17.5, -1.127899498))
            Line((17.5, -1.127899498), (15.993964631, -0.439426187))
            ThreePointArc((15.993964631, -0.439426187), (15.396484426, -4.352960754), (13.856406461, -8))
            Line((13.856406461, -8), (15.25, -8))
            ThreePointArc((15.25, -8), (15.909009742, -6.409009742), (17.5, -5.75))
        make_face()
    extrude(amount=-BOSS_EXTRUDE6_DEPTH)

    # Fillet4
    fillet4_edges = [part.edges().sort_by_distance(p)[0] for p in [
        (14.551591609, -6.652156164, 0.5),
        (-14.551591609, -6.652156164, 0.5),
    ]]
    fillet(fillet4_edges, radius=FILLET4_R - 0.0001)  # a hair under: the kernel refuses the full size

    # Sketch22 → Cut-Extrude11 (cut)
    with BuildSketch(Plane.XY.offset(5.5)):
        Polygon((15.993964631, -0.439426187), (10.796967628, -11.807857132), (12.161179341, -12.431496772), (17.358176345, -1.063065827), align=None)
        Polygon((-15.993964631, -0.439426187), (-10.796967628, -11.807857132), (-12.161179341, -12.431496772), (-17.358176345, -1.063065827), align=None)
    extrude(amount=CUT_EXTRUDE11_DEPTH, mode=Mode.SUBTRACT)

    # Sketch23 → Cut-Extrude12 (cut)
    with BuildSketch(Plane.XY.offset(5.5)):
        Polygon((-19.126954006, -4.441038113), (-21.395628408, -7.629502556), (-19.768674403, -11.188464443), (-15.873045994, -11.558961887), (-13.604371592, -8.370497444), (-15.231325597, -4.811535557), align=None)
        Polygon((19.175049478, -4.335829267), (15.1642598, -4.717279233), (13.489210323, -8.381449966), (15.824950522, -11.664170733), (19.8357402, -11.282720767), (21.510789677, -7.618550034), align=None)
    extrude(amount=-CUT_EXTRUDE12_DEPTH, mode=Mode.SUBTRACT)


solid = part.part
